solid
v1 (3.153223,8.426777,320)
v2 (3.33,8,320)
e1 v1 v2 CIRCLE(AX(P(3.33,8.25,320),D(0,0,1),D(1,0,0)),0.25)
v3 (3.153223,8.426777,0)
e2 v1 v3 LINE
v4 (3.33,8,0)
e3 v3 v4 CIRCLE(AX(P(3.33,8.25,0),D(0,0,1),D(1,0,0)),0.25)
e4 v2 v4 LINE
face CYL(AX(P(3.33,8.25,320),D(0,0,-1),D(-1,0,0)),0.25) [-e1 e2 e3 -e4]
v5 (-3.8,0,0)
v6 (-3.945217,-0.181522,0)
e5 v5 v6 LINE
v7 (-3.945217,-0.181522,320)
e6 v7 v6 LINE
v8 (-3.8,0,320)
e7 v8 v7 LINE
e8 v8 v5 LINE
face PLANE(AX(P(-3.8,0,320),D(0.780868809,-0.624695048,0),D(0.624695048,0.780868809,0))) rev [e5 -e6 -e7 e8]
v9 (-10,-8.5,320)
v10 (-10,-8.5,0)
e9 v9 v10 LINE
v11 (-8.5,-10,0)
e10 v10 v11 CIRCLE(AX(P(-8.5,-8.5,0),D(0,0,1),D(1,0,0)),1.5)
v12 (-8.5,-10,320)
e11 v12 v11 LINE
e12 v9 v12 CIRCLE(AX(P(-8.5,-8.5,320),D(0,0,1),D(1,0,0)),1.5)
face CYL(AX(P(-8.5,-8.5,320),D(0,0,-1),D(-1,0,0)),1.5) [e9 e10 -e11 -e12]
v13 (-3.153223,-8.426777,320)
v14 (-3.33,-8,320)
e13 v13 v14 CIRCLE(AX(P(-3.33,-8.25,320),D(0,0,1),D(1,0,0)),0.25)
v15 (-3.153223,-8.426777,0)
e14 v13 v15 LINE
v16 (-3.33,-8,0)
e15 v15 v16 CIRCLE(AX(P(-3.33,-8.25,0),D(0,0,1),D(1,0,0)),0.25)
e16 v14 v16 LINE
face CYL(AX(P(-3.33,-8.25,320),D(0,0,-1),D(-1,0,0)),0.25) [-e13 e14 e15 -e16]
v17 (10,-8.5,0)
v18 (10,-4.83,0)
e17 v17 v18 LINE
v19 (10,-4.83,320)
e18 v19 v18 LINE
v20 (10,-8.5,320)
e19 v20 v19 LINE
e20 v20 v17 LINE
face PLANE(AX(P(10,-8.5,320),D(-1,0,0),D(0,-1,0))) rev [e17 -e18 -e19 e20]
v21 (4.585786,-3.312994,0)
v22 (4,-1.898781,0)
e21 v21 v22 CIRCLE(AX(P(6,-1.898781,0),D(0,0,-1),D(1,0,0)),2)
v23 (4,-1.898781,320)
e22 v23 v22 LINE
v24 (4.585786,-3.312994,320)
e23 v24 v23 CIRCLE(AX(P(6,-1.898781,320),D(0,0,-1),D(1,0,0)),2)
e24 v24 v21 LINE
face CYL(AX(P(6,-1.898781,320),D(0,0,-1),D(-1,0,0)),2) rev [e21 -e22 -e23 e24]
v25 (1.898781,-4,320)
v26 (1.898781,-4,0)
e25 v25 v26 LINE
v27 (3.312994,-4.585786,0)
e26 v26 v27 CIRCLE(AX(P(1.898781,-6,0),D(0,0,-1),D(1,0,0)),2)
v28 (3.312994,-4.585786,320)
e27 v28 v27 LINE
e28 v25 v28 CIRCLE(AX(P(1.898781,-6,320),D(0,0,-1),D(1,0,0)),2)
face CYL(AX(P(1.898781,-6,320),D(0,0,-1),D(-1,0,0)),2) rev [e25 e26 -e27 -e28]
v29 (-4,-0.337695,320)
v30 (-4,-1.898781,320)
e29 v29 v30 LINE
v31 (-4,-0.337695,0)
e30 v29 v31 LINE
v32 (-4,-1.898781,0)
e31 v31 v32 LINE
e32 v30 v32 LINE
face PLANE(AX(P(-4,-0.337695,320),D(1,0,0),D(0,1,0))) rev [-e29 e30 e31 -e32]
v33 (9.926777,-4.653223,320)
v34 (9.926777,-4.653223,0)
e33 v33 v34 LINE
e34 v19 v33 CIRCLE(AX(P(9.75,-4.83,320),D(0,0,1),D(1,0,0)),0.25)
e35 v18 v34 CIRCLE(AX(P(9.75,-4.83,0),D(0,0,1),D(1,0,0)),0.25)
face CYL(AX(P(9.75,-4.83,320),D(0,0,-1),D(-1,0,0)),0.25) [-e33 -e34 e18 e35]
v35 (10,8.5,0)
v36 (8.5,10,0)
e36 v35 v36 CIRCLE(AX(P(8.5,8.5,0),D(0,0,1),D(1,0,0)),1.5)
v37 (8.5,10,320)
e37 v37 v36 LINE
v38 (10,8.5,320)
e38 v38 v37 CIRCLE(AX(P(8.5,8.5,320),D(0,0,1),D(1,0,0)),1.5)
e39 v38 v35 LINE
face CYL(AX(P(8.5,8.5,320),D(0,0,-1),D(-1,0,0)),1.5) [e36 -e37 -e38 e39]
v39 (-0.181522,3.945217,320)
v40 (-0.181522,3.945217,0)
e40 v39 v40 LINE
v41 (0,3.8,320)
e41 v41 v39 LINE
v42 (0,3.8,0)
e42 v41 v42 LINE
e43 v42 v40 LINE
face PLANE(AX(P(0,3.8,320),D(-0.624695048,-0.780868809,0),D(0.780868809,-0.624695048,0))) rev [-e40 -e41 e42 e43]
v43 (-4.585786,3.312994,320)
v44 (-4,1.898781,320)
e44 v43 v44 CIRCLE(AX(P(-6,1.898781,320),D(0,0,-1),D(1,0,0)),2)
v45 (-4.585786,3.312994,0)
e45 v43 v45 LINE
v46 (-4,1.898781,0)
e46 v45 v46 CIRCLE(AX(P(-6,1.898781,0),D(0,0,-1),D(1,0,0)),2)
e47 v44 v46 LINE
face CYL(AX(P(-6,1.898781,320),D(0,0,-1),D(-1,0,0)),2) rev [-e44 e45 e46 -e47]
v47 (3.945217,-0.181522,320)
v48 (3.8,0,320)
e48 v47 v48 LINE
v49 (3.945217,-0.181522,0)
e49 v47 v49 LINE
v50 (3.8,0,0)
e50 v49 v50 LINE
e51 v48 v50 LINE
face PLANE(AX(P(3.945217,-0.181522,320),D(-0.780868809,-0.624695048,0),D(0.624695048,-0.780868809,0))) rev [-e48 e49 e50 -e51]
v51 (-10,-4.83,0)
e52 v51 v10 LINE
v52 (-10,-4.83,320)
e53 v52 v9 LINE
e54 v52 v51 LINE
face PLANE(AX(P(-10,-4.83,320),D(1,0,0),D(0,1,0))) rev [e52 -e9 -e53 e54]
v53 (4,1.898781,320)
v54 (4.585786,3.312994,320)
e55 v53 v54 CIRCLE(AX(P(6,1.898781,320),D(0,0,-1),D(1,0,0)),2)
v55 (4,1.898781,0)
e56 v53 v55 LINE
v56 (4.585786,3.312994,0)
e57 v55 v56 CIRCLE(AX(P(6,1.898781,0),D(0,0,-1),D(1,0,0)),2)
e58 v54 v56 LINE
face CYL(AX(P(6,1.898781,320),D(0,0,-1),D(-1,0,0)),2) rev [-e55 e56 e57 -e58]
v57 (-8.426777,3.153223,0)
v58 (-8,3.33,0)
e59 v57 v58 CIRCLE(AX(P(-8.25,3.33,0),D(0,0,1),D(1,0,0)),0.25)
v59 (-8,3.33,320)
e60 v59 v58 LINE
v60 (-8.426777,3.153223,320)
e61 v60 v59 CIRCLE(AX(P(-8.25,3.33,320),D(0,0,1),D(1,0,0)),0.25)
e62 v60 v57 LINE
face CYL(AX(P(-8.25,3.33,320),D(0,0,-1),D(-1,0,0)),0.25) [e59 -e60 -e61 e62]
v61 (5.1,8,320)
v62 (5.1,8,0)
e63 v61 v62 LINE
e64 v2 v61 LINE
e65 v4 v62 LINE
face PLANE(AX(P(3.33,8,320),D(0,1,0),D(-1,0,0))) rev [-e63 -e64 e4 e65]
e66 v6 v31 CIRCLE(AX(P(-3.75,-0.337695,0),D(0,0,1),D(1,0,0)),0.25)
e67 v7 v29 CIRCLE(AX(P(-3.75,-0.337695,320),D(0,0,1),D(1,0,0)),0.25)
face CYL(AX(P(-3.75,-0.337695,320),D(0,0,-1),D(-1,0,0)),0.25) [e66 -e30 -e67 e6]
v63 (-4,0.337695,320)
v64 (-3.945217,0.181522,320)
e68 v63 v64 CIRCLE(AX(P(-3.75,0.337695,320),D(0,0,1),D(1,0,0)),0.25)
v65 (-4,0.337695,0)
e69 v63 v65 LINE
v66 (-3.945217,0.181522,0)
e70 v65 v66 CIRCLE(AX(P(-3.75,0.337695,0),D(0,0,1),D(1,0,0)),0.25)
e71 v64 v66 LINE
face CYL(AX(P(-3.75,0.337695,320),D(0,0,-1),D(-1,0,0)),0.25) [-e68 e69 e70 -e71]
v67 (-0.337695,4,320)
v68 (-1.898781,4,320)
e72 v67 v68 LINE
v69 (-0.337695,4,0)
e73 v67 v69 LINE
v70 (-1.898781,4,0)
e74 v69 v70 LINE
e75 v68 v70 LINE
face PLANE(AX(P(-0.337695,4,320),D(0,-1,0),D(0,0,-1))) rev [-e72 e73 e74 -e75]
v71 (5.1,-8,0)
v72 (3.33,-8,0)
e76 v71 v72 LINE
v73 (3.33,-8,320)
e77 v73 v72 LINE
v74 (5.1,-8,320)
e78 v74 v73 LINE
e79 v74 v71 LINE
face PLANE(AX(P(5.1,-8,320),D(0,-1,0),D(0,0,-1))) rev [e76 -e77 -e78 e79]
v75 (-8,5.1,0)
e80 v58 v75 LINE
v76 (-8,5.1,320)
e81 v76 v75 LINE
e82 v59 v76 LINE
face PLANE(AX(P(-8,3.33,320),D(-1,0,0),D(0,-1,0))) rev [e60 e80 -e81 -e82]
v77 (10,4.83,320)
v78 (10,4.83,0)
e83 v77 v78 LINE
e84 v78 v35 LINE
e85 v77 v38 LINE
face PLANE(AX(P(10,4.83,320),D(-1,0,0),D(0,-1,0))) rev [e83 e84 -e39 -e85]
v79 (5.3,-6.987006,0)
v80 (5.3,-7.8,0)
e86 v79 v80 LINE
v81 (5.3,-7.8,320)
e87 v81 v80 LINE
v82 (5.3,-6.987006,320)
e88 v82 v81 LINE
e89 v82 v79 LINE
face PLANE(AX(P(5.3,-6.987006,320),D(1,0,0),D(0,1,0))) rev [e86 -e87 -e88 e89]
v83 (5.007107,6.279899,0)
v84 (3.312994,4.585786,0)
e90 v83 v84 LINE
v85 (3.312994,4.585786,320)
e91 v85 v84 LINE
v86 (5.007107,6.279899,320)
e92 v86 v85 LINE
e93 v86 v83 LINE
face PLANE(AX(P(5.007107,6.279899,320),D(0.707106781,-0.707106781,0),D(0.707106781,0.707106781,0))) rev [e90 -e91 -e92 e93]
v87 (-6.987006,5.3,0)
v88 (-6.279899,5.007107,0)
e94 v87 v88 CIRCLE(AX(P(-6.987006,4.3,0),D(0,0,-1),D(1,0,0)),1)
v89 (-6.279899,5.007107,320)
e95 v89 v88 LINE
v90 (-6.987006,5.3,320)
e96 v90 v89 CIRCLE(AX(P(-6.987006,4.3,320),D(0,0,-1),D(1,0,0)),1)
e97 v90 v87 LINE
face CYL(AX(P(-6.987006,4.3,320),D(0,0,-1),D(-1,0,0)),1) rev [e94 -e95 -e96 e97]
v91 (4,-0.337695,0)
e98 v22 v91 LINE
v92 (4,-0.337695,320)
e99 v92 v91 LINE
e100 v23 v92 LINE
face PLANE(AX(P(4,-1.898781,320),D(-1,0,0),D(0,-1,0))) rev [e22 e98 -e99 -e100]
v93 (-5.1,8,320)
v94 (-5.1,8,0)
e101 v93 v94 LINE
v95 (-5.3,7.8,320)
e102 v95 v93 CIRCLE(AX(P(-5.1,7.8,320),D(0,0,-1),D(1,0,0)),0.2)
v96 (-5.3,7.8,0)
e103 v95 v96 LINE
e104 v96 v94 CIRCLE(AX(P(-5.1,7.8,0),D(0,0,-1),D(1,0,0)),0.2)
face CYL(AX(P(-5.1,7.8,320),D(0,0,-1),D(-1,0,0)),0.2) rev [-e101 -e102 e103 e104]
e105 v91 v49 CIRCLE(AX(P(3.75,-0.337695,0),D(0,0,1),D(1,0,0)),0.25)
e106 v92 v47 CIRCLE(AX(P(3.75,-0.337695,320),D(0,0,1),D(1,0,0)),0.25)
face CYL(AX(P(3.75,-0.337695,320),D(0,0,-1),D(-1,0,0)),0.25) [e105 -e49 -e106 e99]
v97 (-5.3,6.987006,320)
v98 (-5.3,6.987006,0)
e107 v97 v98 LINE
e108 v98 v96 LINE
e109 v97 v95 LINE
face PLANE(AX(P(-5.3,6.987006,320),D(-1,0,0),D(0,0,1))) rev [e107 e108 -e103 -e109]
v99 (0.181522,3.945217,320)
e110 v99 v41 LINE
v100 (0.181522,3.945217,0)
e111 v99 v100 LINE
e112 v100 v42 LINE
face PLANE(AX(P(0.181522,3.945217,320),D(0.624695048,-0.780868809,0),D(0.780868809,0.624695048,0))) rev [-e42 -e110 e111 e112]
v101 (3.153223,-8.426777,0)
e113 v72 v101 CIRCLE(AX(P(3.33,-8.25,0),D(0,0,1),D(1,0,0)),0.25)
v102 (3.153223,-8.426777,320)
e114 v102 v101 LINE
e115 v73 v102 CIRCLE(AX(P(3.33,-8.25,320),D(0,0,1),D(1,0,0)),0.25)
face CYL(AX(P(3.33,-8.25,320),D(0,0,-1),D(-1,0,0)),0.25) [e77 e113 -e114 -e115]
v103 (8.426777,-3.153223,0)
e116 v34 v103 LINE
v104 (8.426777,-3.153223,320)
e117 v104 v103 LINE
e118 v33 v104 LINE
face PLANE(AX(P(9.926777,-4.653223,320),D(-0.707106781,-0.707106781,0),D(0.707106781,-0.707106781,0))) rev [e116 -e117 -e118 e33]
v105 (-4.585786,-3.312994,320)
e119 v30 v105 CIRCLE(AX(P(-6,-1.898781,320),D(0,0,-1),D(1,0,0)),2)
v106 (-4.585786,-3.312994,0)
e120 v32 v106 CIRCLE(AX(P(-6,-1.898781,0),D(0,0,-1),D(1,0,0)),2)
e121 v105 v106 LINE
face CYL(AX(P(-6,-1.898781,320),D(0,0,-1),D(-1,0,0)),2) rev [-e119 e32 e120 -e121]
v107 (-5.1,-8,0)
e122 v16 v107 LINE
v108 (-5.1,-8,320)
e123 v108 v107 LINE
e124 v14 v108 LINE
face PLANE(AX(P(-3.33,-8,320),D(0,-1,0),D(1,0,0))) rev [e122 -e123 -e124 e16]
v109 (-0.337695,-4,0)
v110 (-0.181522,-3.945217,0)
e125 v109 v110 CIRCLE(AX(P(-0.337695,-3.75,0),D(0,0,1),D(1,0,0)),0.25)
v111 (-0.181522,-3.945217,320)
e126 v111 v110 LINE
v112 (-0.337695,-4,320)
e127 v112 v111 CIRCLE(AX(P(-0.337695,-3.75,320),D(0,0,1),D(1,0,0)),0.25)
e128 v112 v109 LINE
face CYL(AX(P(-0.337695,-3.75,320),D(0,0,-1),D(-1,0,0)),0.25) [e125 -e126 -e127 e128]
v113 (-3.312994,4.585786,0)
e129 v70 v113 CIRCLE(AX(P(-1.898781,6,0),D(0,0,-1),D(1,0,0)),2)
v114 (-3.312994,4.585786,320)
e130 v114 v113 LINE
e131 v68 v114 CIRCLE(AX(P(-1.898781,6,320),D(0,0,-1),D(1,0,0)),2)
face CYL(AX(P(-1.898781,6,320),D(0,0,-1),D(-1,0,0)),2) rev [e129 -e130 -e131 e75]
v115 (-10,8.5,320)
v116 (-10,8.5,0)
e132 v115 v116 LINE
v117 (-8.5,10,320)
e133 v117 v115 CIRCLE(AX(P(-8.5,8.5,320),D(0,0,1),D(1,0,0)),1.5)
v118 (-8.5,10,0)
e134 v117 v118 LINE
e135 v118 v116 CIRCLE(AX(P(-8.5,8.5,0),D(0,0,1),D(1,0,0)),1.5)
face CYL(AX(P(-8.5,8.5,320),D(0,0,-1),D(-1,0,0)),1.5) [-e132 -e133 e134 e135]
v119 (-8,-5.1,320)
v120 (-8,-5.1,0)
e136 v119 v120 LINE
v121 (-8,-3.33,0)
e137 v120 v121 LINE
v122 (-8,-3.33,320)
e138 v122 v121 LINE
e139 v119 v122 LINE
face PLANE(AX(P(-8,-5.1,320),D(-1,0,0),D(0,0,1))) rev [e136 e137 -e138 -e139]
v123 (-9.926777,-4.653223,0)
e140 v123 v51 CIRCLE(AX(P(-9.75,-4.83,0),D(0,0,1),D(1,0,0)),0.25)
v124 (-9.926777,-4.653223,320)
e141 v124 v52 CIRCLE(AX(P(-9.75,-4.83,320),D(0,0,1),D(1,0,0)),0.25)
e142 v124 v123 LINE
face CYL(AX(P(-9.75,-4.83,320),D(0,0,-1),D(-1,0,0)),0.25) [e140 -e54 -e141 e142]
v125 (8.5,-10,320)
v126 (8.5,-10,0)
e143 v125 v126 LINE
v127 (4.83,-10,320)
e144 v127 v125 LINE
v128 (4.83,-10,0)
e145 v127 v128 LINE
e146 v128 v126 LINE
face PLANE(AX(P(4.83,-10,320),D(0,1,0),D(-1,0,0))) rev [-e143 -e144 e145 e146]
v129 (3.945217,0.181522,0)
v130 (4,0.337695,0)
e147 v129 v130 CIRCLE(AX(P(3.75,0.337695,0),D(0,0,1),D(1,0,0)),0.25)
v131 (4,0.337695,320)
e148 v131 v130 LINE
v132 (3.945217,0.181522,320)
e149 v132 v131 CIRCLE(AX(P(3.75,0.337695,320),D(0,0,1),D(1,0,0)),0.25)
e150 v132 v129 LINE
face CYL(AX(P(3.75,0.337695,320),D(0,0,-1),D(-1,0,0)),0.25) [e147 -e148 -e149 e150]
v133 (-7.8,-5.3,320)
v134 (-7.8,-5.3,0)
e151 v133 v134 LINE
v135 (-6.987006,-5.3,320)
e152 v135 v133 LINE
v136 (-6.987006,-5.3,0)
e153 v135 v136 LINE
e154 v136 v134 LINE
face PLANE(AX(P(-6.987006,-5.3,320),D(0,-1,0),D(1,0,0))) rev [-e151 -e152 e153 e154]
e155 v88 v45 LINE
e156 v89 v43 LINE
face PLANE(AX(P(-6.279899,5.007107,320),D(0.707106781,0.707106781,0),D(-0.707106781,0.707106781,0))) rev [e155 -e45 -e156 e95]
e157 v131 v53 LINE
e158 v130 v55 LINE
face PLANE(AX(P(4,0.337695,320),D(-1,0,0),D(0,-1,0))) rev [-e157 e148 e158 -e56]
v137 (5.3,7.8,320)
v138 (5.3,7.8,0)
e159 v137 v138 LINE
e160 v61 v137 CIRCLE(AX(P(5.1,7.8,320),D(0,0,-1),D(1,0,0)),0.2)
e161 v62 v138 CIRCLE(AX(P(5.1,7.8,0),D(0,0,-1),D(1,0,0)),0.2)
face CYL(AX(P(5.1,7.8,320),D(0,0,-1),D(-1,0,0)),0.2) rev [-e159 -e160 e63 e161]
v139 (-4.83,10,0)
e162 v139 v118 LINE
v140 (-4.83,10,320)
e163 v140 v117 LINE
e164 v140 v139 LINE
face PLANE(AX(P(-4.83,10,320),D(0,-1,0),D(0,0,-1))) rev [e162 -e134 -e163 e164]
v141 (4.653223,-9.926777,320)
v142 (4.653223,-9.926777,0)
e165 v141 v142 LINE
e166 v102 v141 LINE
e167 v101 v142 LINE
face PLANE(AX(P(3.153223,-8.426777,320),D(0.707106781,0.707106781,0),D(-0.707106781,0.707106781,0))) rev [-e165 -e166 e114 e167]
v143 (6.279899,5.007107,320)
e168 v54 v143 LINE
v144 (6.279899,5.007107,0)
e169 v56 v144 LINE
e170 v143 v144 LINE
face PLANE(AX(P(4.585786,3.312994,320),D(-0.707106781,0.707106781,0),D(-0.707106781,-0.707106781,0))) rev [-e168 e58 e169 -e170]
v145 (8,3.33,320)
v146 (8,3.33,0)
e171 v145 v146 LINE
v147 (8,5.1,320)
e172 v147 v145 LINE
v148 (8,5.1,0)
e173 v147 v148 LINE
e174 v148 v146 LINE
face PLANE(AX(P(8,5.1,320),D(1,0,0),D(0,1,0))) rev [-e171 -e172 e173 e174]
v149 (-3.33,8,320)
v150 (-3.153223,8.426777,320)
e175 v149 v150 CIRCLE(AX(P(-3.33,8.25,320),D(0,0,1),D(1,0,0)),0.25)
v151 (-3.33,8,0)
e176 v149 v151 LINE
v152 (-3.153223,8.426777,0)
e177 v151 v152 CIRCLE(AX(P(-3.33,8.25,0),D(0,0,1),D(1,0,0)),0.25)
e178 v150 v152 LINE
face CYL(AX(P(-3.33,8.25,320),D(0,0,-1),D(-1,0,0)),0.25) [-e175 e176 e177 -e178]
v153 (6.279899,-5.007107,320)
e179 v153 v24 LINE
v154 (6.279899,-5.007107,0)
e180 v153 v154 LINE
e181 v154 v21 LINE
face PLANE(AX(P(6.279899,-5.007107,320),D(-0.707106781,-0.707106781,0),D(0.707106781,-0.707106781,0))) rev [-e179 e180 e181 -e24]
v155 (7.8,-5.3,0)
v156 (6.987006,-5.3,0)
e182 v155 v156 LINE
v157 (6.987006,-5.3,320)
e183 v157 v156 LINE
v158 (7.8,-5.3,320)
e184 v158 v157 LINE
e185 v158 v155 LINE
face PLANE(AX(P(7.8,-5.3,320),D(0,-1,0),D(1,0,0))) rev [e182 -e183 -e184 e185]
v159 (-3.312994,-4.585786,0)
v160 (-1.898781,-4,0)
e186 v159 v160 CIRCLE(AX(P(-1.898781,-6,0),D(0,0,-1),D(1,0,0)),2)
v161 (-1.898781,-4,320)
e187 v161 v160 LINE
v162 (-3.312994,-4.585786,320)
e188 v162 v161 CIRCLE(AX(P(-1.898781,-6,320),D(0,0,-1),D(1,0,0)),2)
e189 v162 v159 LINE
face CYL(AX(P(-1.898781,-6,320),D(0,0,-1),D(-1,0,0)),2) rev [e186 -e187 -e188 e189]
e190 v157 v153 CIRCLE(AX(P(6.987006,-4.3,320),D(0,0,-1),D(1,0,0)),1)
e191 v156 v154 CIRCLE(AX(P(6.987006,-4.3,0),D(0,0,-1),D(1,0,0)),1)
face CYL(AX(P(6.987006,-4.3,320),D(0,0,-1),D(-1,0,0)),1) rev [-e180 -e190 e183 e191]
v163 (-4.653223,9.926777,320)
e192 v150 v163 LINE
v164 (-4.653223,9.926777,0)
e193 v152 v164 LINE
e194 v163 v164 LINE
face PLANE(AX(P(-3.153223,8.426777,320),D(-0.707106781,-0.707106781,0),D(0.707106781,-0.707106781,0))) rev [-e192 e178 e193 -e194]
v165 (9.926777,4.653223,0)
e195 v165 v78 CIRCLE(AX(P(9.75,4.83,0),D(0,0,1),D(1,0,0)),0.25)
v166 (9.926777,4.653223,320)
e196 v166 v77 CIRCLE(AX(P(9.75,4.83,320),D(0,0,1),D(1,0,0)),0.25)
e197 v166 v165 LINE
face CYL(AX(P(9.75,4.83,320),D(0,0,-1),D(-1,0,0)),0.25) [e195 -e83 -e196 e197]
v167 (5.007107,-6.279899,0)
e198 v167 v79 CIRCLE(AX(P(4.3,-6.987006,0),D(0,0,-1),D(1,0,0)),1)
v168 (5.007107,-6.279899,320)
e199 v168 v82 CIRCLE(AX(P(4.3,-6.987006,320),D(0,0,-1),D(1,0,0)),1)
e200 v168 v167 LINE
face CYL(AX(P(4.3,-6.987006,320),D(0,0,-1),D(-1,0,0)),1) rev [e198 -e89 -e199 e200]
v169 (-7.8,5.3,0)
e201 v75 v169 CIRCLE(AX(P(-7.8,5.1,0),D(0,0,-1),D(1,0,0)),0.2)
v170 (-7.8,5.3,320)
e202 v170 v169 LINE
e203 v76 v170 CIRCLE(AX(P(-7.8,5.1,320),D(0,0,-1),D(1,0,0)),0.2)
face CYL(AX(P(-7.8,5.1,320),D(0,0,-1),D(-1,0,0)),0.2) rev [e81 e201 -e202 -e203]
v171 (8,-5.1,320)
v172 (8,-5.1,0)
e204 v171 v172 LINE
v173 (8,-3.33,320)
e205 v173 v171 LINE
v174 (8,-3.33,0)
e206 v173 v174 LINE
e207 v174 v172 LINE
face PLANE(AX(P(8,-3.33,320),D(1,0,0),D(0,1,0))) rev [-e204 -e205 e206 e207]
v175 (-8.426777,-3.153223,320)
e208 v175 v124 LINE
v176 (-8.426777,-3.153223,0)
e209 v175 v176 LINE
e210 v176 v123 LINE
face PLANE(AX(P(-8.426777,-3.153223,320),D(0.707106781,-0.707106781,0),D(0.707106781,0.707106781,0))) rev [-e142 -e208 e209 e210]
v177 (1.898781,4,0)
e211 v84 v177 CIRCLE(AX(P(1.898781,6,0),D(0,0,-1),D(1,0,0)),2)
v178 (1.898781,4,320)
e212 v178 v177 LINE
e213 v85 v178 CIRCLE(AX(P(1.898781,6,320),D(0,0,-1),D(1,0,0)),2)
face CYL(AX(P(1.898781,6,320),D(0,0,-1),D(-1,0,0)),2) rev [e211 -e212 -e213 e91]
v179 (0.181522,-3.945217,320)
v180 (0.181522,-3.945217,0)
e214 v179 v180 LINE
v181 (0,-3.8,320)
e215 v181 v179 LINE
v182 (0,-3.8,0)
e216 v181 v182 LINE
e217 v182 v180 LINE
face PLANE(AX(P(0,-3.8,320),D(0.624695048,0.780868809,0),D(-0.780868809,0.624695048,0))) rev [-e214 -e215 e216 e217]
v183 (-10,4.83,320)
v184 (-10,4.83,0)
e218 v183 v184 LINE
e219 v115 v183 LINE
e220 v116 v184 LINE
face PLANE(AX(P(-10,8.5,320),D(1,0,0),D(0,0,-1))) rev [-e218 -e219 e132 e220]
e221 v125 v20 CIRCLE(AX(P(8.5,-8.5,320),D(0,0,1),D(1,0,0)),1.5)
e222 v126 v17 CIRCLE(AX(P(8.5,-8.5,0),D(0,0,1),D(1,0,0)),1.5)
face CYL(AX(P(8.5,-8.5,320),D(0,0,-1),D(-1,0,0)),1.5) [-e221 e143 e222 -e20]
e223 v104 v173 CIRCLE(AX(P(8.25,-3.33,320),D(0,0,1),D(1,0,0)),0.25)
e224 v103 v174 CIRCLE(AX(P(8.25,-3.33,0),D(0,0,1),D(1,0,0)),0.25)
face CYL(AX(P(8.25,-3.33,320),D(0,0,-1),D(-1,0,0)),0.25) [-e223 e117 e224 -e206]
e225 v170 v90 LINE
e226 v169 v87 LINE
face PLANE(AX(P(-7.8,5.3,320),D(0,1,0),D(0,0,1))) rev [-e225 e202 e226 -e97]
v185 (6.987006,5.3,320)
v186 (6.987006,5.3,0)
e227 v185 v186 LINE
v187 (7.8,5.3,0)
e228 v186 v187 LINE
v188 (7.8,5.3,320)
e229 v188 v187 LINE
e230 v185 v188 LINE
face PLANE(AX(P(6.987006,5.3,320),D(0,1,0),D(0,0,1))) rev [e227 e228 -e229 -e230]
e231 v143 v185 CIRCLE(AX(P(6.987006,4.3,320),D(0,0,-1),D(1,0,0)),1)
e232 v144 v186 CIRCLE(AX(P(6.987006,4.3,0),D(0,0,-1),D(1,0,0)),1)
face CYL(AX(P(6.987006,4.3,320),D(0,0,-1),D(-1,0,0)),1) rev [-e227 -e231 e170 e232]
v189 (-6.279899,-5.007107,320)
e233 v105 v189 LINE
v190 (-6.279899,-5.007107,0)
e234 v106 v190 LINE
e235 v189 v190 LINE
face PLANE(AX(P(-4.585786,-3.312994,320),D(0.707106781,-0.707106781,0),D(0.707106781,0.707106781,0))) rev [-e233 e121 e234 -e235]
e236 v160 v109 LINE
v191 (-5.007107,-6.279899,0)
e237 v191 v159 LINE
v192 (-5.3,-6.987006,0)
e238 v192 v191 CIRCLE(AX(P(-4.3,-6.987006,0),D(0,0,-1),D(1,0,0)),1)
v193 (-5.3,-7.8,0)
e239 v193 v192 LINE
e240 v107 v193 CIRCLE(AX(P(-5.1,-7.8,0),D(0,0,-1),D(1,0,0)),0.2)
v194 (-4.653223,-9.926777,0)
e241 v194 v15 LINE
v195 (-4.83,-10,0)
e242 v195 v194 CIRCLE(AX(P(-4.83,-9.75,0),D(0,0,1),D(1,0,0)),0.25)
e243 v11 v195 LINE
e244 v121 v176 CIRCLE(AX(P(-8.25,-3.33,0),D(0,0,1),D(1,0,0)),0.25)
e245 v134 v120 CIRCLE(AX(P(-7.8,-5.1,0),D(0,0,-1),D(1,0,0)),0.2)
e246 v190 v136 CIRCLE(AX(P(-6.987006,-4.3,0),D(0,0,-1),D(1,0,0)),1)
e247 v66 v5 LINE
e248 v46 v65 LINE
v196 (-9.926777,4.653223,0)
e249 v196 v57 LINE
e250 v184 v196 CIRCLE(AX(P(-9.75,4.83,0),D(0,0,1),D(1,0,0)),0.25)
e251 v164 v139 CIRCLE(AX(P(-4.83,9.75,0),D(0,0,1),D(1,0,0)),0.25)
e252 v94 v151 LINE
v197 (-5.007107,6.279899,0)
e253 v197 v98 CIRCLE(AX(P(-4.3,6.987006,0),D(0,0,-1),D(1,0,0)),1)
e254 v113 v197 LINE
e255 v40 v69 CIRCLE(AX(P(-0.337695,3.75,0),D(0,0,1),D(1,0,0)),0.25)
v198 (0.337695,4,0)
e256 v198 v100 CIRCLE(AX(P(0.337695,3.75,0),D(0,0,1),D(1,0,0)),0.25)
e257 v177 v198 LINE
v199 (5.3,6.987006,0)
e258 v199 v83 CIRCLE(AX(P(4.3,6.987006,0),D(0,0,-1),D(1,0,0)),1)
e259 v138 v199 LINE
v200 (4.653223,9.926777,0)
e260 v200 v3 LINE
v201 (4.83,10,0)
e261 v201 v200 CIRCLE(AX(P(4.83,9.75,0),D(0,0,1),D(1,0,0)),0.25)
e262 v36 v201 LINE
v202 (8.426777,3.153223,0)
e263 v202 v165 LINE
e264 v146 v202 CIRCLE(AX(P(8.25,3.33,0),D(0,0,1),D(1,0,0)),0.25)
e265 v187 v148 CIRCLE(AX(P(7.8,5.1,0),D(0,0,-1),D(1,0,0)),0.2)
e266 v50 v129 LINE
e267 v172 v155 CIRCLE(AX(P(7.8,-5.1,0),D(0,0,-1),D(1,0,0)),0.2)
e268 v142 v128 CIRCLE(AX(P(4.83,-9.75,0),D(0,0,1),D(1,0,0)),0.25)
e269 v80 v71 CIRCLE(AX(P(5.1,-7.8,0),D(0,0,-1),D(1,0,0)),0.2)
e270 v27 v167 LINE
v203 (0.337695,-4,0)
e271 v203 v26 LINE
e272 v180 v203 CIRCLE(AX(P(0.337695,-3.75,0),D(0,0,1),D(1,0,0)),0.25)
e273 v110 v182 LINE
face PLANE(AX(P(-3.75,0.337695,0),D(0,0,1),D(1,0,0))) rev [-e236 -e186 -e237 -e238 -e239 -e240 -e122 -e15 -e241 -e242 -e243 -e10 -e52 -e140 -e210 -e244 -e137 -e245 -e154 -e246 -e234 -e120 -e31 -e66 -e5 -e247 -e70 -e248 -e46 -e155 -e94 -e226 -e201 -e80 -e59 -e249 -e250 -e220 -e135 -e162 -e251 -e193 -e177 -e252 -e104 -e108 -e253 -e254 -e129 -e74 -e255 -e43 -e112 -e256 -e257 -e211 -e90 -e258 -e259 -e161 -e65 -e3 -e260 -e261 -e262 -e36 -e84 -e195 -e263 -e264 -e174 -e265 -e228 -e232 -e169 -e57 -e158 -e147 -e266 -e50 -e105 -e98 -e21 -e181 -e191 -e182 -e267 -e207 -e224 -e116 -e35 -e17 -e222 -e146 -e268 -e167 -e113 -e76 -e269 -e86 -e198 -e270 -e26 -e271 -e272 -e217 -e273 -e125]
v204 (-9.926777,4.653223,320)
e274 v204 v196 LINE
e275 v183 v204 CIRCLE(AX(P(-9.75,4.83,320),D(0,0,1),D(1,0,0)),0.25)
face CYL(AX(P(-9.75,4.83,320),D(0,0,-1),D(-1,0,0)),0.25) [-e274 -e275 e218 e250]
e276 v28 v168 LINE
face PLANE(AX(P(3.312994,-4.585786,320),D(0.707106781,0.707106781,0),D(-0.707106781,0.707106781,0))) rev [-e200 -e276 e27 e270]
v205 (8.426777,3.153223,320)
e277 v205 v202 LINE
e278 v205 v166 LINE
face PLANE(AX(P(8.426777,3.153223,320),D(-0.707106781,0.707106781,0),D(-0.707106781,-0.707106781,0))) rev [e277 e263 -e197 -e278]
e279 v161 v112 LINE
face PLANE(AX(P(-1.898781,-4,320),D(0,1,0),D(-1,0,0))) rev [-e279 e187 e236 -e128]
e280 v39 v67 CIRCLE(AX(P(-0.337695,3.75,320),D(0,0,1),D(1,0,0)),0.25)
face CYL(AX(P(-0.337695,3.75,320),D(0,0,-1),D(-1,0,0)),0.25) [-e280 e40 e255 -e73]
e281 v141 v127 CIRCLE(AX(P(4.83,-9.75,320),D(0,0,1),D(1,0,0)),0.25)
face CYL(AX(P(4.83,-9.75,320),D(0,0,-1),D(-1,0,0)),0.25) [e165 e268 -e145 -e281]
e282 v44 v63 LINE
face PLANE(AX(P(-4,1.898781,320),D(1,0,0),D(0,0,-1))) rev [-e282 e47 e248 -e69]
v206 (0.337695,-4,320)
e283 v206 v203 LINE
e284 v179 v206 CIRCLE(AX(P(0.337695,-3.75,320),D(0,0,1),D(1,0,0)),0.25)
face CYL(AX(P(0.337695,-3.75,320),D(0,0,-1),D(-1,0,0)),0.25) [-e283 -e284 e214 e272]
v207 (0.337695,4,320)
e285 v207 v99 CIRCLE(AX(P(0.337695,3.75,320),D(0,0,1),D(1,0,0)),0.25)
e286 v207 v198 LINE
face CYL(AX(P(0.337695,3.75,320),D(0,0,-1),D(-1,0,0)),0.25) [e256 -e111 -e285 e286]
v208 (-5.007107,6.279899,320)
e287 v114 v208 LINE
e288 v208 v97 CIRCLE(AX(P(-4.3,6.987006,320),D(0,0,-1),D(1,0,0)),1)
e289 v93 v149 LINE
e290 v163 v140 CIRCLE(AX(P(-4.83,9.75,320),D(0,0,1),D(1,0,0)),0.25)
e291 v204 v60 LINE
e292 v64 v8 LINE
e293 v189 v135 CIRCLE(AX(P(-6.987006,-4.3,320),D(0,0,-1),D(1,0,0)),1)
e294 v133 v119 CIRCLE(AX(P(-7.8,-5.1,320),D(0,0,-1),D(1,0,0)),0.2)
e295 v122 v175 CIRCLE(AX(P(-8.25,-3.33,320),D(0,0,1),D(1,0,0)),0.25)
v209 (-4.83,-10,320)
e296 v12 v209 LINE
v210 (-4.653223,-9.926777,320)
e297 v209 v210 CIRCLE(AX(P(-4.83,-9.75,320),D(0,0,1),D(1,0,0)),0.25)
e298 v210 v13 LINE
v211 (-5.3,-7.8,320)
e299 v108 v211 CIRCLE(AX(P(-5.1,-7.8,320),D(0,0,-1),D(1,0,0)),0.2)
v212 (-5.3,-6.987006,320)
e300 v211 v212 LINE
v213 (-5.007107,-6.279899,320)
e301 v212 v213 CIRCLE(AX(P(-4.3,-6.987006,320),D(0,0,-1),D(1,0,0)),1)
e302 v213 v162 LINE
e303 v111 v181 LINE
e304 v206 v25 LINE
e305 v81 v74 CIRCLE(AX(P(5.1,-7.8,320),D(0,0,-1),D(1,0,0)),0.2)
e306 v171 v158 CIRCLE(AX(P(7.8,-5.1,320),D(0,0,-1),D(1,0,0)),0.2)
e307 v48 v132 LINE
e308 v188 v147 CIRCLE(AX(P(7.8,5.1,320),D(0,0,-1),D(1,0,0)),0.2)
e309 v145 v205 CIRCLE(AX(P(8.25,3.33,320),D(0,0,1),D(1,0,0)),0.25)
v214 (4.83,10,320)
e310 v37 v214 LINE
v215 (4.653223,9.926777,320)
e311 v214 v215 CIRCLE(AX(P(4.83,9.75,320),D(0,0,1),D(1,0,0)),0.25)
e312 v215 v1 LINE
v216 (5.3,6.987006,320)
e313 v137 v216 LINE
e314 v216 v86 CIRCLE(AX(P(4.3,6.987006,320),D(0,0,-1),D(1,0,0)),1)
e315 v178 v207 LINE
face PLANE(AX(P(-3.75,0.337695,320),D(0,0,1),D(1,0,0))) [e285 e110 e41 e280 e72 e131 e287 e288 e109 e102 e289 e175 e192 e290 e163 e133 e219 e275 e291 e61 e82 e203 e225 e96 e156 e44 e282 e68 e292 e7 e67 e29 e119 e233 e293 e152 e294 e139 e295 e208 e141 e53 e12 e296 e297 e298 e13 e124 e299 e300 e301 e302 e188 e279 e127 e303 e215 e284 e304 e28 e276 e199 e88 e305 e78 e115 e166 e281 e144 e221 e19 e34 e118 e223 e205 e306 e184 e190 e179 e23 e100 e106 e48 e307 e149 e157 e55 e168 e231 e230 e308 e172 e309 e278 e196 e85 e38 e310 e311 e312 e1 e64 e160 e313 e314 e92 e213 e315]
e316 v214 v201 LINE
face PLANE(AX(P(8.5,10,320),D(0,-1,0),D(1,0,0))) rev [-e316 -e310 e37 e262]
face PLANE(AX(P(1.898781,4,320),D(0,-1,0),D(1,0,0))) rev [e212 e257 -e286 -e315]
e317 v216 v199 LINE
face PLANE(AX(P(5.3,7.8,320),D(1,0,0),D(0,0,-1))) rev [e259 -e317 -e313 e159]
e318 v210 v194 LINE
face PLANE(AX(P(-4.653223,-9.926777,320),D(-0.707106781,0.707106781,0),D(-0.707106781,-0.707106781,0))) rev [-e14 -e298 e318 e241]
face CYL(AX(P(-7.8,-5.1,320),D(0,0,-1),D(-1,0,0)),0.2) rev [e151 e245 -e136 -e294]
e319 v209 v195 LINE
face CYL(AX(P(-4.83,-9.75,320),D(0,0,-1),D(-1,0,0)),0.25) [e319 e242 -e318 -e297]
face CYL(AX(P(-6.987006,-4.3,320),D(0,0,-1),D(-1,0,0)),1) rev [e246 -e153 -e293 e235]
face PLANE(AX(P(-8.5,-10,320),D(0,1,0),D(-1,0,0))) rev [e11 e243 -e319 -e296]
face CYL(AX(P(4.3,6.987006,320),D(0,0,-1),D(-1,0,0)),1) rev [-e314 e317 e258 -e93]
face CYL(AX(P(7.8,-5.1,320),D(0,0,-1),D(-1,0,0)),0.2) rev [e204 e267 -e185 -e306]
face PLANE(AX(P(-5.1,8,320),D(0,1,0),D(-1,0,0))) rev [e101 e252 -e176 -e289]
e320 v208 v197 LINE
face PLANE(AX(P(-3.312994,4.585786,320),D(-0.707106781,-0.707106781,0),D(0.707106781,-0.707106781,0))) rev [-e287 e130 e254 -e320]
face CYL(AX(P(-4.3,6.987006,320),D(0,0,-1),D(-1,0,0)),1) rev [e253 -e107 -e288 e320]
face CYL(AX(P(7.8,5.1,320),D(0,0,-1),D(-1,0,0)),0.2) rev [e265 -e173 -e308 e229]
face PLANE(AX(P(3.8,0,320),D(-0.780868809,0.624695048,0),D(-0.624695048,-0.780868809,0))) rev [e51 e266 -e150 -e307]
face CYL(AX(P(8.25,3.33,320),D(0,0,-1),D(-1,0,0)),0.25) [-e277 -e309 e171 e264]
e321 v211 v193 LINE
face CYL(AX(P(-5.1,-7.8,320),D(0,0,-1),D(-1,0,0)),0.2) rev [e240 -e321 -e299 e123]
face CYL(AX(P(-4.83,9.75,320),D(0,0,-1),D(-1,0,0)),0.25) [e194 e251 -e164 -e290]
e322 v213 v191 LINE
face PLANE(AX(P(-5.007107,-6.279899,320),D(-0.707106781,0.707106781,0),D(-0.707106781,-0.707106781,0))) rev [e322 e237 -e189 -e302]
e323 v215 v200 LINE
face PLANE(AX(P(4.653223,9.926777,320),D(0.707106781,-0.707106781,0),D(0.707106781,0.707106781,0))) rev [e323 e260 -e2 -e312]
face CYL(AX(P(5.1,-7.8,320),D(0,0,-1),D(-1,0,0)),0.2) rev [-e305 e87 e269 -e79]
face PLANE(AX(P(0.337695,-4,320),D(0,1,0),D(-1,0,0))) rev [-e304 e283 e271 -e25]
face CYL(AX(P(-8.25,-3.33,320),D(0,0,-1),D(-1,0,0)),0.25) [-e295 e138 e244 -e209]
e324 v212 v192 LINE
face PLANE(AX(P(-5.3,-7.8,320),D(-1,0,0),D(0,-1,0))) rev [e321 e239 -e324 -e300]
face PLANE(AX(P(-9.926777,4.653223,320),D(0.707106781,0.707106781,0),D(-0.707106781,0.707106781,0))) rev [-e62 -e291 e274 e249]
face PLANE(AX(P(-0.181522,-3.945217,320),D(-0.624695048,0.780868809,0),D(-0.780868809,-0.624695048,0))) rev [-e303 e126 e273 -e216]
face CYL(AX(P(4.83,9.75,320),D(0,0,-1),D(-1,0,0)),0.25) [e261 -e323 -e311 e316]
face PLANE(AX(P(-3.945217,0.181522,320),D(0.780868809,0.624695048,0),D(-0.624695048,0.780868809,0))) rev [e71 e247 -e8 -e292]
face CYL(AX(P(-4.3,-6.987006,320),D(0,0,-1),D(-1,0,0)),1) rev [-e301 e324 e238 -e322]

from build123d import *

# Parameters (mm, degrees)
EXTRUDE_1_DEPTH = 320


# Read off the part's stored shape, not the designer's step: 222 Конструкционный профиль 20х20-1-surface1
with BuildPart() as part:
    # Эскиз1 → Бобышка-Вытянуть1 (new body)
    with BuildSketch(Plane.XY):
        with BuildLine():
            Line((-3.945217202, 0.181521503), (-3.8, 0))
            Line((-3.8, 0), (-3.945217202, -0.181521503))
            ThreePointArc((-3.945217202, -0.181521503), (-3.98590708, -0.254943529), (-4, -0.337695265))
            Line((-4, -0.337695265), (-4, -1.898780669))
            ThreePointArc((-4, -1.898780669), (-4.152240935, -2.664147534), (-4.585786438, -3.312994231))
            Line((-4.585786438, -3.312994231), (-6.279898987, -5.007106781))
            ThreePointArc((-6.279898987, -5.007106781), (-6.604322336, -5.223879533), (-6.987005769, -5.3))
            Line((-6.987005769, -5.3), (-7.8, -5.3))
            ThreePointArc((-7.8, -5.3), (-7.941421356, -5.241421356), (-8, -5.1))
            Line((-8, -5.1), (-8, -3.33))
            ThreePointArc((-8, -3.33), (-8.154329142, -3.099030117), (-8.426776695, -3.153223305))
            Line((-8.426776695, -3.153223305), (-9.926776695, -4.653223305))
            ThreePointArc((-9.926776695, -4.653223305), (-9.980969883, -4.734329142), (-10, -4.83))
            Line((-10, -4.83), (-10, -8.5))
            ThreePointArc((-10, -8.5), (-9.560660172, -9.560660172), (-8.5, -10))
            Line((-8.5, -10), (-4.83, -10))
            ThreePointArc((-4.83, -10), (-4.734329142, -9.980969883), (-4.653223305, -9.926776695))
            Line((-4.653223305, -9.926776695), (-3.153223305, -8.426776695))
            ThreePointArc((-3.153223305, -8.426776695), (-3.099030117, -8.154329142), (-3.33, -8))
            Line((-3.33, -8), (-5.1, -8))
            ThreePointArc((-5.1, -8), (-5.241421356, -7.941421356), (-5.3, -7.8))
            Line((-5.3, -7.8), (-5.3, -6.987005769))
            ThreePointArc((-5.3, -6.987005769), (-5.223879533, -6.604322336), (-5.007106781, -6.279898987))
            Line((-5.007106781, -6.279898987), (-3.312994231, -4.585786438))
            ThreePointArc((-3.312994231, -4.585786438), (-2.664147534, -4.152240935), (-1.898780669, -4))
            Line((-1.898780669, -4), (-0.337695265, -4))
            ThreePointArc((-0.337695265, -4), (-0.254943529, -3.98590708), (-0.181521503, -3.945217202))
            Line((-0.181521503, -3.945217202), (0, -3.8))
            Line((0, -3.8), (0.181521503, -3.945217202))
            ThreePointArc((0.181521503, -3.945217202), (0.254943529, -3.98590708), (0.337695265, -4))
            Line((0.337695265, -4), (1.898780669, -4))
            ThreePointArc((1.898780669, -4), (2.664147534, -4.152240935), (3.312994231, -4.585786438))
            Line((3.312994231, -4.585786438), (5.007106781, -6.279898987))
            ThreePointArc((5.007106781, -6.279898987), (5.223879533, -6.604322336), (5.3, -6.987005769))
            Line((5.3, -6.987005769), (5.3, -7.8))
            ThreePointArc((5.3, -7.8), (5.241421356, -7.941421356), (5.1, -8))
            Line((5.1, -8), (3.33, -8))
            ThreePointArc((3.33, -8), (3.099030117, -8.154329142), (3.153223305, -8.426776695))
            Line((3.153223305, -8.426776695), (4.653223305, -9.926776695))
            ThreePointArc((4.653223305, -9.926776695), (4.734329142, -9.980969883), (4.83, -10))
            Line((4.83, -10), (8.5, -10))
            ThreePointArc((8.5, -10), (9.560660172, -9.560660172), (10, -8.5))
            Line((10, -8.5), (10, -4.83))
            ThreePointArc((10, -4.83), (9.980969883, -4.734329142), (9.926776695, -4.653223305))
            Line((9.926776695, -4.653223305), (8.426776695, -3.153223305))
            ThreePointArc((8.426776695, -3.153223305), (8.154329142, -3.099030117), (8, -3.33))
            Line((8, -3.33), (8, -5.1))
            ThreePointArc((8, -5.1), (7.941421356, -5.241421356), (7.8, -5.3))
            Line((7.8, -5.3), (6.987005769, -5.3))
            ThreePointArc((6.987005769, -5.3), (6.604322336, -5.223879533), (6.279898987, -5.007106781))
            Line((6.279898987, -5.007106781), (4.585786438, -3.312994231))
            ThreePointArc((4.585786438, -3.312994231), (4.152240935, -2.664147534), (4, -1.898780669))
            Line((4, -1.898780669), (4, -0.337695265))
            ThreePointArc((4, -0.337695265), (3.98590708, -0.254943529), (3.945217202, -0.181521503))
            Line((3.945217202, -0.181521503), (3.8, 0))
            Line((3.8, 0), (3.945217202, 0.181521503))
            ThreePointArc((3.945217202, 0.181521503), (3.98590708, 0.254943529), (4, 0.337695265))
            Line((4, 0.337695265), (4, 1.898780669))
            ThreePointArc((4, 1.898780669), (4.152240935, 2.664147534), (4.585786438, 3.312994231))
            Line((4.585786438, 3.312994231), (6.279898987, 5.007106781))
            ThreePointArc((6.279898987, 5.007106781), (6.604322336, 5.223879533), (6.987005769, 5.3))
            Line((6.987005769, 5.3), (7.8, 5.3))
            ThreePointArc((7.8, 5.3), (7.941421356, 5.241421356), (8, 5.1))
            Line((8, 5.1), (8, 3.33))
            ThreePointArc((8, 3.33), (8.154329142, 3.099030117), (8.426776695, 3.153223305))
            Line((8.426776695, 3.153223305), (9.926776695, 4.653223305))
            ThreePointArc((9.926776695, 4.653223305), (9.980969883, 4.734329142), (10, 4.83))
            Line((10, 4.83), (10, 8.5))
            ThreePointArc((10, 8.5), (9.560660172, 9.560660172), (8.5, 10))
            Line((8.5, 10), (4.83, 10))
            ThreePointArc((4.83, 10), (4.734329142, 9.980969883), (4.653223305, 9.926776695))
            Line((4.653223305, 9.926776695), (3.153223305, 8.426776695))
            ThreePointArc((3.153223305, 8.426776695), (3.099030117, 8.154329142), (3.33, 8))
            Line((3.33, 8), (5.1, 8))
            ThreePointArc((5.1, 8), (5.241421356, 7.941421356), (5.3, 7.8))
            Line((5.3, 7.8), (5.3, 6.987005769))
            ThreePointArc((5.3, 6.987005769), (5.223879533, 6.604322336), (5.007106781, 6.279898987))
            Line((5.007106781, 6.279898987), (3.312994231, 4.585786438))
            ThreePointArc((3.312994231, 4.585786438), (2.664147534, 4.152240935), (1.898780669, 4))
            Line((1.898780669, 4), (0.337695265, 4))
            ThreePointArc((0.337695265, 4), (0.254943529, 3.98590708), (0.181521503, 3.945217202))
            Line((0.181521503, 3.945217202), (0, 3.8))
            Line((0, 3.8), (-0.181521503, 3.945217202))
            ThreePointArc((-0.181521503, 3.945217202), (-0.254943529, 3.98590708), (-0.337695265, 4))
            Line((-0.337695265, 4), (-1.898780669, 4))
            ThreePointArc((-1.898780669, 4), (-2.664147534, 4.152240935), (-3.312994231, 4.585786438))
            Line((-3.312994231, 4.585786438), (-5.007106781, 6.279898987))
            ThreePointArc((-5.007106781, 6.279898987), (-5.223879533, 6.604322336), (-5.3, 6.987005769))
            Line((-5.3, 6.987005769), (-5.3, 7.8))
            ThreePointArc((-5.3, 7.8), (-5.241421356, 7.941421356), (-5.1, 8))
            Line((-5.1, 8), (-3.33, 8))
            ThreePointArc((-3.33, 8), (-3.099030117, 8.154329142), (-3.153223305, 8.426776695))
            Line((-3.153223305, 8.426776695), (-4.653223305, 9.926776695))
            ThreePointArc((-4.653223305, 9.926776695), (-4.734329142, 9.980969883), (-4.83, 10))
            Line((-4.83, 10), (-8.5, 10))
            ThreePointArc((-8.5, 10), (-9.560660172, 9.560660172), (-10, 8.5))
            Line((-10, 8.5), (-10, 4.83))
            ThreePointArc((-10, 4.83), (-9.980969883, 4.734329142), (-9.926776695, 4.653223305))
            Line((-9.926776695, 4.653223305), (-8.426776695, 3.153223305))
            ThreePointArc((-8.426776695, 3.153223305), (-8.154329142, 3.099030117), (-8, 3.33))
            Line((-8, 3.33), (-8, 5.1))
            ThreePointArc((-8, 5.1), (-7.941421356, 5.241421356), (-7.8, 5.3))
            Line((-7.8, 5.3), (-6.987005769, 5.3))
            ThreePointArc((-6.987005769, 5.3), (-6.604322336, 5.223879533), (-6.279898987, 5.007106781))
            Line((-6.279898987, 5.007106781), (-4.585786438, 3.312994231))
            ThreePointArc((-4.585786438, 3.312994231), (-4.152240935, 2.664147534), (-4, 1.898780669))
            Line((-4, 1.898780669), (-4, 0.337695265))
            ThreePointArc((-4, 0.337695265), (-3.98590708, 0.254943529), (-3.945217202, 0.181521503))
        make_face()
    extrude(amount=EXTRUDE_1_DEPTH)


solid = part.part
